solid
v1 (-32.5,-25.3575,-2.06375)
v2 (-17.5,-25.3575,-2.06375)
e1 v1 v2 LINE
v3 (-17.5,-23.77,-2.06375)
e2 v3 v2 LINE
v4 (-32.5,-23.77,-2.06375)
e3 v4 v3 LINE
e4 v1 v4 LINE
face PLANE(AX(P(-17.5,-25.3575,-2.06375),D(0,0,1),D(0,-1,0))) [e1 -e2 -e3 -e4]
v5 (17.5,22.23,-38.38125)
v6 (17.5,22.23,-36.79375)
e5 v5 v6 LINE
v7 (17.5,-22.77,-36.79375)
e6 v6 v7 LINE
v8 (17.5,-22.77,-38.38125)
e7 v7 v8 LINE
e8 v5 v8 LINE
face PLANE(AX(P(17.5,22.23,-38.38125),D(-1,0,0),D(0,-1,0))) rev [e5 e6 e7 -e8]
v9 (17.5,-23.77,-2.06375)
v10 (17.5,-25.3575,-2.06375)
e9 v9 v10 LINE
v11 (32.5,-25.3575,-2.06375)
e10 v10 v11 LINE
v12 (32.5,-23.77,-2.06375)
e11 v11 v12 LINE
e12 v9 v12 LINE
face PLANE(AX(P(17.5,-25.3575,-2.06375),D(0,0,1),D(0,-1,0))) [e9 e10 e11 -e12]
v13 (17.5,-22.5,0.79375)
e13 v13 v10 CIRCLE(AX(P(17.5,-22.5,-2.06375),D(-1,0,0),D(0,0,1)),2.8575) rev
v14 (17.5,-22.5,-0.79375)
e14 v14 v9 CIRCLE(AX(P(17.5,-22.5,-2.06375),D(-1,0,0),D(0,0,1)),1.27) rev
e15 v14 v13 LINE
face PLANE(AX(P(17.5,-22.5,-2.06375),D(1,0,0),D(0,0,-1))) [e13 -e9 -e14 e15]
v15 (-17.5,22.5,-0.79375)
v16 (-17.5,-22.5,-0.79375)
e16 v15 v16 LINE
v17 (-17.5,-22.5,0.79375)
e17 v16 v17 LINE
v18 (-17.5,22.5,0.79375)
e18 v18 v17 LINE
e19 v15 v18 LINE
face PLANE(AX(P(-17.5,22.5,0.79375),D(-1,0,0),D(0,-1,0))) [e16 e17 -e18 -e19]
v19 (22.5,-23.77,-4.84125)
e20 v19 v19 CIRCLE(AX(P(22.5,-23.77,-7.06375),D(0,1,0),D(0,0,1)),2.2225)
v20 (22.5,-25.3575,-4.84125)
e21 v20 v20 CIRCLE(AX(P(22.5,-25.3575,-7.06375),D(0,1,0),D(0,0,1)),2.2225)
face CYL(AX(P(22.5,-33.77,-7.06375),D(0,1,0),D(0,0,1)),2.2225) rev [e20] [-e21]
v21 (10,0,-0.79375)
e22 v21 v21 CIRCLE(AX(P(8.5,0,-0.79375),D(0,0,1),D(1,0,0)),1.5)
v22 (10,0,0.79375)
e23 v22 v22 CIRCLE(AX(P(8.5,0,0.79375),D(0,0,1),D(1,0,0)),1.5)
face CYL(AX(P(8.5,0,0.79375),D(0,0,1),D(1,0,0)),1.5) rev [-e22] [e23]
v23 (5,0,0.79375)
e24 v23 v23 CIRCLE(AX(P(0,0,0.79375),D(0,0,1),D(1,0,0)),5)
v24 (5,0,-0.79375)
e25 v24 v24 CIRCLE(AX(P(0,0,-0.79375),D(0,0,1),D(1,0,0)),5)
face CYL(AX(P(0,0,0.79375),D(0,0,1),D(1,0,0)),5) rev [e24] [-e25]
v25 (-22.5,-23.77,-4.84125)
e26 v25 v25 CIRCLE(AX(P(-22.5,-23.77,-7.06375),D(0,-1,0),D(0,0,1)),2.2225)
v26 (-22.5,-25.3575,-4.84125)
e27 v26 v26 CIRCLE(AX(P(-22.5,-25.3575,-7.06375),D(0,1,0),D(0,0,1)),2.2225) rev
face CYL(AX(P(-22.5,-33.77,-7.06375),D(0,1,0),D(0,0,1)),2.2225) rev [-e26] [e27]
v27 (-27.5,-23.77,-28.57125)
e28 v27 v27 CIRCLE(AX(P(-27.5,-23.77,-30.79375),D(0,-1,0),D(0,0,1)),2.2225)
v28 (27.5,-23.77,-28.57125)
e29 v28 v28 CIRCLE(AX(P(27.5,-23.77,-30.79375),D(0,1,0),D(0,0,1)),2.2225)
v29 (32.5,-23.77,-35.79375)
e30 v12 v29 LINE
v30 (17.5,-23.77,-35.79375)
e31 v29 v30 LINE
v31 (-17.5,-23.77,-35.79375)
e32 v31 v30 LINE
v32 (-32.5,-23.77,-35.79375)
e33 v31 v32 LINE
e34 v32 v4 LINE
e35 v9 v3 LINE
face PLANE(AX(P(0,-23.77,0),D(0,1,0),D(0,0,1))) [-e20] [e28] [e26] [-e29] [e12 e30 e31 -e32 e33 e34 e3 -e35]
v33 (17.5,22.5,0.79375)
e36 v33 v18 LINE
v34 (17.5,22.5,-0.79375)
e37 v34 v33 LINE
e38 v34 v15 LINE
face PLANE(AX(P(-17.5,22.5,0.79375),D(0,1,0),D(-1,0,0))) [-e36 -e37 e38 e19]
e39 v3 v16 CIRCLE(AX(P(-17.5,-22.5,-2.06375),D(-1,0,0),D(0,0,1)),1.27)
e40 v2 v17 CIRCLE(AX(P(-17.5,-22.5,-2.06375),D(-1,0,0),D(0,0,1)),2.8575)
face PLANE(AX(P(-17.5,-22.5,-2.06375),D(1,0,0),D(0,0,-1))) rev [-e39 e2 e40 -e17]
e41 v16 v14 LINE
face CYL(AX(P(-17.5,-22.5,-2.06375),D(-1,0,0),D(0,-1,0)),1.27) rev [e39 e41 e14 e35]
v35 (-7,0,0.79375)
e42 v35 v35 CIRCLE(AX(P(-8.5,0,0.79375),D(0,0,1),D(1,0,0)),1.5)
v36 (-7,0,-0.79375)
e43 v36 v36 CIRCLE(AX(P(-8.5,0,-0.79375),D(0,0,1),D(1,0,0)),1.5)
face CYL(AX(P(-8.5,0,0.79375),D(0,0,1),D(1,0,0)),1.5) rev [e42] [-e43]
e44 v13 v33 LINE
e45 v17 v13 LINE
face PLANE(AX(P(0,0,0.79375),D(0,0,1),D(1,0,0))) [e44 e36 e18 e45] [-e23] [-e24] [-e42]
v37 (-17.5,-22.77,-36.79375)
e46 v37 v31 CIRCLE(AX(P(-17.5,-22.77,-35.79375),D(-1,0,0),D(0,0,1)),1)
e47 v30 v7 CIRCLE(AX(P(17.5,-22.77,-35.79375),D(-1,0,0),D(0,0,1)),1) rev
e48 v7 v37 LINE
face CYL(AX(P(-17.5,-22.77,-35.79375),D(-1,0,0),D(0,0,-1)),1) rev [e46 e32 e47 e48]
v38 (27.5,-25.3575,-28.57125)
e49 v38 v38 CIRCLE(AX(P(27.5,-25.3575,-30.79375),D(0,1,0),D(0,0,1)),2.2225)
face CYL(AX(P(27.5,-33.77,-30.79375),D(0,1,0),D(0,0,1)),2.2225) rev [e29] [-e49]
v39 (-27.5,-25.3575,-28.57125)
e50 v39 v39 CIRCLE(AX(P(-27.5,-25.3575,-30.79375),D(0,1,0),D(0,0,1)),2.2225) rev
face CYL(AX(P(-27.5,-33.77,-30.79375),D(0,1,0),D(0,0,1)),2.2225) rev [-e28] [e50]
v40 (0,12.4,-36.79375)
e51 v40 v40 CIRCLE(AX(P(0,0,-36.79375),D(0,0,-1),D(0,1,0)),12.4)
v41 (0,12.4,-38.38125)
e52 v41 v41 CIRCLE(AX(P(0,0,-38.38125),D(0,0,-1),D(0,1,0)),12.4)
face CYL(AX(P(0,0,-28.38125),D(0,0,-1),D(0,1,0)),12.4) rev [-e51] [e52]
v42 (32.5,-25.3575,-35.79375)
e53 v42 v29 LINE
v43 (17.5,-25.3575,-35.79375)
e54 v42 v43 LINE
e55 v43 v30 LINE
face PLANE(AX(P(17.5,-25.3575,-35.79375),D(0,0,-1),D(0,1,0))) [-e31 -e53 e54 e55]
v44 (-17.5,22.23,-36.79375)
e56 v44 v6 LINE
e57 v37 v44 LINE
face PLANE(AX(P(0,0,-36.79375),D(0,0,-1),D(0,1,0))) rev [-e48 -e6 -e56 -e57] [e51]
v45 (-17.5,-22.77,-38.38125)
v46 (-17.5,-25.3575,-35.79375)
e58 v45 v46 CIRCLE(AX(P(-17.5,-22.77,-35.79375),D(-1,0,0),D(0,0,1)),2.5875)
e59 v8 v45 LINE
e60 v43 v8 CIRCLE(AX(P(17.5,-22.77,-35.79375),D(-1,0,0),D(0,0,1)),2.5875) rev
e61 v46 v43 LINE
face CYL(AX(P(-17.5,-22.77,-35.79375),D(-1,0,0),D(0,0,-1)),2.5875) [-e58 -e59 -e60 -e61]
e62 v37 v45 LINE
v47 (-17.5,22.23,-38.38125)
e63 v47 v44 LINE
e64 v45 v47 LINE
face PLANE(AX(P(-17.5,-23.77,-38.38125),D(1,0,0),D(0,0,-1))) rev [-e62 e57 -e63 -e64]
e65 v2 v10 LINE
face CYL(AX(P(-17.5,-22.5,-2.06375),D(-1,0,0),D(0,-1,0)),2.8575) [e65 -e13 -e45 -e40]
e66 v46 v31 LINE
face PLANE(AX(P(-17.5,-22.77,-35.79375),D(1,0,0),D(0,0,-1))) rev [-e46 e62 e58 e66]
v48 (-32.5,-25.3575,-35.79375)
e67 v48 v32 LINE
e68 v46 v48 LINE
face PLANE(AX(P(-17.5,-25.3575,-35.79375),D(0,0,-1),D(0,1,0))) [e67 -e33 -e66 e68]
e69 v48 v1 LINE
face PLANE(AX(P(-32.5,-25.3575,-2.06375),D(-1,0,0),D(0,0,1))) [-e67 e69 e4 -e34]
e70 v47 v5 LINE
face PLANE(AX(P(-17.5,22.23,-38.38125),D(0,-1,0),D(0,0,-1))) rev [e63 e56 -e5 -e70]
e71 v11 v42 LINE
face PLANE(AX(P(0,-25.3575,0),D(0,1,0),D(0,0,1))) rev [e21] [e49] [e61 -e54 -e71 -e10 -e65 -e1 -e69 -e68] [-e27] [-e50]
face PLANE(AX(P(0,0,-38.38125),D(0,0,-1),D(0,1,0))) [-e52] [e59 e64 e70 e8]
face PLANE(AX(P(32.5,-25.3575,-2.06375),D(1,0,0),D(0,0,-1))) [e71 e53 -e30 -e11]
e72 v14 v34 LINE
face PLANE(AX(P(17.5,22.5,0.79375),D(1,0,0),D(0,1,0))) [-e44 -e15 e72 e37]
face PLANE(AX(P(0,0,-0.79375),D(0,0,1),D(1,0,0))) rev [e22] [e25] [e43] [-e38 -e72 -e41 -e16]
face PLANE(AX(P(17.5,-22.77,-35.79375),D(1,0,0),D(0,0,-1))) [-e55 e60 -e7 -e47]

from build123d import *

# Parameters (mm, degrees)
SKETCH1_W                  = 35
SKETCH1_H                  = 45
SKETCH1_R                  = 1.5
SKETCH1_R_2                = 5
BOSS_EXTRUDE1_DEPTH        = 0.79375
CONVERT_SOLID2_START       = -0.79375
CONVERT_SOLID2_OUTLINE_W   = 35
CONVERT_SOLID2_OUTLINE_H   = 45
CONVERT_SOLID2_OUTLINE_R   = 1.5
CONVERT_SOLID2_OUTLINE_R_2 = 5
CONVERT_SOLID2_DEPTH       = 0.79375
EDGE_FLANGE1_DEPTH         = 35
EDGE_FLANGE2_DEPTH         = 35
SKETCH24_R                 = 12.4
CUT_EXTRUDE1_DEPTH         = 10
SKETCH29_W                 = 15
SKETCH29_H                 = 33.73
TAB1_DEPTH                 = 1.5875
SKETCH32_W                 = 15
SKETCH32_H                 = 33.73
TAB2_DEPTH                 = 1.5875
SKETCH35_R                 = 2.2225
CUT_EXTRUDE2_DEPTH         = 10


# Read off the part's stored shape, not the designer's step: Convert-Solid2
# Sheet-metal steps are written as plain solids
with BuildPart() as part:
    # Sketch1 → Boss-Extrude1 (new body)
    with BuildSketch(Plane.XY):
        Rectangle(SKETCH1_W, SKETCH1_H)
        with Locations((-8.5, 0)):
            Circle(SKETCH1_R, mode=Mode.SUBTRACT)
        with Locations((8.5, 0)):
            Circle(SKETCH1_R, mode=Mode.SUBTRACT)
        Circle(SKETCH1_R_2, mode=Mode.SUBTRACT)
    extrude(amount=BOSS_EXTRUDE1_DEPTH)

    # Convert-Solid2 outline → Convert-Solid2 (add)
    with BuildSketch(Plane.XY.offset(CONVERT_SOLID2_START)):
        Rectangle(CONVERT_SOLID2_OUTLINE_W, CONVERT_SOLID2_OUTLINE_H)
        with Locations((-8.5, 0)):
            Circle(CONVERT_SOLID2_OUTLINE_R, mode=Mode.SUBTRACT)
        Circle(CONVERT_SOLID2_OUTLINE_R_2, mode=Mode.SUBTRACT)
        with Locations((8.5, 0)):
            Circle(CONVERT_SOLID2_OUTLINE_R, mode=Mode.SUBTRACT)
    extrude(amount=CONVERT_SOLID2_DEPTH)

    # Edge-Flange1 section (across the edge) → Edge-Flange1 (add)
    with BuildSketch(Plane(origin=(17.5, -23.77, -0.79375), x_dir=(0, 1, 0), z_dir=(-1, 0, 0))):
        with BuildLine():
            Line((-1.5875, 1.27), (-1.5875, 35))
            Line((-1.5875, 35), (0, 35))
            Line((0, 35), (0, 1.27))
            ThreePointArc((0, 1.27), (0.371974388, 0.371974388), (1.27, 0))
            Line((1.27, 0), (1.27, -1.5875))
            ThreePointArc((1.27, -1.5875), (-0.750557627, -0.750557627), (-1.5875, 1.27))
        make_face()
    extrude(amount=EDGE_FLANGE1_DEPTH)

    # Edge-Flange2 section (across the edge) → Edge-Flange2 (add)
    with BuildSketch(Plane(origin=(17.5, -23.77, -36.79375), x_dir=(0, 0, 1), z_dir=(-1, 0, 0))):
        with BuildLine():
            Line((-1.5875, 1), (-1.5875, 46))
            Line((-1.5875, 46), (0, 46))
            Line((0, 46), (0, 1))
            ThreePointArc((0, 1), (0.292893219, 0.292893219), (1, 0))
            Line((1, 0), (1, -1.5875))
            ThreePointArc((1, -1.5875), (-0.829638796, -0.829638796), (-1.5875, 1))
        make_face()
    extrude(amount=EDGE_FLANGE2_DEPTH)

    # Sketch24 → Cut-Extrude1 (cut)
    with BuildSketch(Plane(origin=(0, 0, -38.38125), x_dir=(-1, 0, 0), z_dir=(0, 0, -1))):
        with Locations(Location((0, 0, 0), (0, 0, 90))):
            Circle(SKETCH24_R)
    extrude(amount=-CUT_EXTRUDE1_DEPTH, mode=Mode.SUBTRACT)

    # Sketch29 → Tab1 (add)
    with BuildSketch(Plane(origin=(0, -23.77, 0), x_dir=(1, 0, 0), z_dir=(0, 1, 0))):
        with Locations((25, 18.92875)):
            Rectangle(SKETCH29_W, SKETCH29_H)
    extrude(amount=-TAB1_DEPTH)

    # Sketch32 → Tab2 (add)
    with BuildSketch(Plane(origin=(0, -23.77, 0), x_dir=(1, 0, 0), z_dir=(0, 1, 0))):
        with Locations((-25, 18.92875)):
            Rectangle(SKETCH32_W, SKETCH32_H)
    extrude(amount=-TAB2_DEPTH)

    # Sketch35 → Cut-Extrude2 (cut)
    with BuildSketch(Plane(origin=(0, -23.77, 0), x_dir=(1, 0, 0), z_dir=(0, 1, 0))):
        with Locations(Location((22.5, 7.06375, 0), (0, 0, 270))):
            Circle(SKETCH35_R)
        with Locations(Location((27.5, 30.79375, 0), (0, 0, 270))):
            Circle(SKETCH35_R)
    cut_extrude2 = extrude(amount=-CUT_EXTRUDE2_DEPTH, mode=Mode.SUBTRACT)

    # Mirror1: Cut-Extrude2 across plane
    add(cut_extrude2.mirror(Plane(origin=(0, 0, 0), x_dir=(0, 0, 1), z_dir=(1, 0, 0))), mode=Mode.SUBTRACT)


solid = part.part
